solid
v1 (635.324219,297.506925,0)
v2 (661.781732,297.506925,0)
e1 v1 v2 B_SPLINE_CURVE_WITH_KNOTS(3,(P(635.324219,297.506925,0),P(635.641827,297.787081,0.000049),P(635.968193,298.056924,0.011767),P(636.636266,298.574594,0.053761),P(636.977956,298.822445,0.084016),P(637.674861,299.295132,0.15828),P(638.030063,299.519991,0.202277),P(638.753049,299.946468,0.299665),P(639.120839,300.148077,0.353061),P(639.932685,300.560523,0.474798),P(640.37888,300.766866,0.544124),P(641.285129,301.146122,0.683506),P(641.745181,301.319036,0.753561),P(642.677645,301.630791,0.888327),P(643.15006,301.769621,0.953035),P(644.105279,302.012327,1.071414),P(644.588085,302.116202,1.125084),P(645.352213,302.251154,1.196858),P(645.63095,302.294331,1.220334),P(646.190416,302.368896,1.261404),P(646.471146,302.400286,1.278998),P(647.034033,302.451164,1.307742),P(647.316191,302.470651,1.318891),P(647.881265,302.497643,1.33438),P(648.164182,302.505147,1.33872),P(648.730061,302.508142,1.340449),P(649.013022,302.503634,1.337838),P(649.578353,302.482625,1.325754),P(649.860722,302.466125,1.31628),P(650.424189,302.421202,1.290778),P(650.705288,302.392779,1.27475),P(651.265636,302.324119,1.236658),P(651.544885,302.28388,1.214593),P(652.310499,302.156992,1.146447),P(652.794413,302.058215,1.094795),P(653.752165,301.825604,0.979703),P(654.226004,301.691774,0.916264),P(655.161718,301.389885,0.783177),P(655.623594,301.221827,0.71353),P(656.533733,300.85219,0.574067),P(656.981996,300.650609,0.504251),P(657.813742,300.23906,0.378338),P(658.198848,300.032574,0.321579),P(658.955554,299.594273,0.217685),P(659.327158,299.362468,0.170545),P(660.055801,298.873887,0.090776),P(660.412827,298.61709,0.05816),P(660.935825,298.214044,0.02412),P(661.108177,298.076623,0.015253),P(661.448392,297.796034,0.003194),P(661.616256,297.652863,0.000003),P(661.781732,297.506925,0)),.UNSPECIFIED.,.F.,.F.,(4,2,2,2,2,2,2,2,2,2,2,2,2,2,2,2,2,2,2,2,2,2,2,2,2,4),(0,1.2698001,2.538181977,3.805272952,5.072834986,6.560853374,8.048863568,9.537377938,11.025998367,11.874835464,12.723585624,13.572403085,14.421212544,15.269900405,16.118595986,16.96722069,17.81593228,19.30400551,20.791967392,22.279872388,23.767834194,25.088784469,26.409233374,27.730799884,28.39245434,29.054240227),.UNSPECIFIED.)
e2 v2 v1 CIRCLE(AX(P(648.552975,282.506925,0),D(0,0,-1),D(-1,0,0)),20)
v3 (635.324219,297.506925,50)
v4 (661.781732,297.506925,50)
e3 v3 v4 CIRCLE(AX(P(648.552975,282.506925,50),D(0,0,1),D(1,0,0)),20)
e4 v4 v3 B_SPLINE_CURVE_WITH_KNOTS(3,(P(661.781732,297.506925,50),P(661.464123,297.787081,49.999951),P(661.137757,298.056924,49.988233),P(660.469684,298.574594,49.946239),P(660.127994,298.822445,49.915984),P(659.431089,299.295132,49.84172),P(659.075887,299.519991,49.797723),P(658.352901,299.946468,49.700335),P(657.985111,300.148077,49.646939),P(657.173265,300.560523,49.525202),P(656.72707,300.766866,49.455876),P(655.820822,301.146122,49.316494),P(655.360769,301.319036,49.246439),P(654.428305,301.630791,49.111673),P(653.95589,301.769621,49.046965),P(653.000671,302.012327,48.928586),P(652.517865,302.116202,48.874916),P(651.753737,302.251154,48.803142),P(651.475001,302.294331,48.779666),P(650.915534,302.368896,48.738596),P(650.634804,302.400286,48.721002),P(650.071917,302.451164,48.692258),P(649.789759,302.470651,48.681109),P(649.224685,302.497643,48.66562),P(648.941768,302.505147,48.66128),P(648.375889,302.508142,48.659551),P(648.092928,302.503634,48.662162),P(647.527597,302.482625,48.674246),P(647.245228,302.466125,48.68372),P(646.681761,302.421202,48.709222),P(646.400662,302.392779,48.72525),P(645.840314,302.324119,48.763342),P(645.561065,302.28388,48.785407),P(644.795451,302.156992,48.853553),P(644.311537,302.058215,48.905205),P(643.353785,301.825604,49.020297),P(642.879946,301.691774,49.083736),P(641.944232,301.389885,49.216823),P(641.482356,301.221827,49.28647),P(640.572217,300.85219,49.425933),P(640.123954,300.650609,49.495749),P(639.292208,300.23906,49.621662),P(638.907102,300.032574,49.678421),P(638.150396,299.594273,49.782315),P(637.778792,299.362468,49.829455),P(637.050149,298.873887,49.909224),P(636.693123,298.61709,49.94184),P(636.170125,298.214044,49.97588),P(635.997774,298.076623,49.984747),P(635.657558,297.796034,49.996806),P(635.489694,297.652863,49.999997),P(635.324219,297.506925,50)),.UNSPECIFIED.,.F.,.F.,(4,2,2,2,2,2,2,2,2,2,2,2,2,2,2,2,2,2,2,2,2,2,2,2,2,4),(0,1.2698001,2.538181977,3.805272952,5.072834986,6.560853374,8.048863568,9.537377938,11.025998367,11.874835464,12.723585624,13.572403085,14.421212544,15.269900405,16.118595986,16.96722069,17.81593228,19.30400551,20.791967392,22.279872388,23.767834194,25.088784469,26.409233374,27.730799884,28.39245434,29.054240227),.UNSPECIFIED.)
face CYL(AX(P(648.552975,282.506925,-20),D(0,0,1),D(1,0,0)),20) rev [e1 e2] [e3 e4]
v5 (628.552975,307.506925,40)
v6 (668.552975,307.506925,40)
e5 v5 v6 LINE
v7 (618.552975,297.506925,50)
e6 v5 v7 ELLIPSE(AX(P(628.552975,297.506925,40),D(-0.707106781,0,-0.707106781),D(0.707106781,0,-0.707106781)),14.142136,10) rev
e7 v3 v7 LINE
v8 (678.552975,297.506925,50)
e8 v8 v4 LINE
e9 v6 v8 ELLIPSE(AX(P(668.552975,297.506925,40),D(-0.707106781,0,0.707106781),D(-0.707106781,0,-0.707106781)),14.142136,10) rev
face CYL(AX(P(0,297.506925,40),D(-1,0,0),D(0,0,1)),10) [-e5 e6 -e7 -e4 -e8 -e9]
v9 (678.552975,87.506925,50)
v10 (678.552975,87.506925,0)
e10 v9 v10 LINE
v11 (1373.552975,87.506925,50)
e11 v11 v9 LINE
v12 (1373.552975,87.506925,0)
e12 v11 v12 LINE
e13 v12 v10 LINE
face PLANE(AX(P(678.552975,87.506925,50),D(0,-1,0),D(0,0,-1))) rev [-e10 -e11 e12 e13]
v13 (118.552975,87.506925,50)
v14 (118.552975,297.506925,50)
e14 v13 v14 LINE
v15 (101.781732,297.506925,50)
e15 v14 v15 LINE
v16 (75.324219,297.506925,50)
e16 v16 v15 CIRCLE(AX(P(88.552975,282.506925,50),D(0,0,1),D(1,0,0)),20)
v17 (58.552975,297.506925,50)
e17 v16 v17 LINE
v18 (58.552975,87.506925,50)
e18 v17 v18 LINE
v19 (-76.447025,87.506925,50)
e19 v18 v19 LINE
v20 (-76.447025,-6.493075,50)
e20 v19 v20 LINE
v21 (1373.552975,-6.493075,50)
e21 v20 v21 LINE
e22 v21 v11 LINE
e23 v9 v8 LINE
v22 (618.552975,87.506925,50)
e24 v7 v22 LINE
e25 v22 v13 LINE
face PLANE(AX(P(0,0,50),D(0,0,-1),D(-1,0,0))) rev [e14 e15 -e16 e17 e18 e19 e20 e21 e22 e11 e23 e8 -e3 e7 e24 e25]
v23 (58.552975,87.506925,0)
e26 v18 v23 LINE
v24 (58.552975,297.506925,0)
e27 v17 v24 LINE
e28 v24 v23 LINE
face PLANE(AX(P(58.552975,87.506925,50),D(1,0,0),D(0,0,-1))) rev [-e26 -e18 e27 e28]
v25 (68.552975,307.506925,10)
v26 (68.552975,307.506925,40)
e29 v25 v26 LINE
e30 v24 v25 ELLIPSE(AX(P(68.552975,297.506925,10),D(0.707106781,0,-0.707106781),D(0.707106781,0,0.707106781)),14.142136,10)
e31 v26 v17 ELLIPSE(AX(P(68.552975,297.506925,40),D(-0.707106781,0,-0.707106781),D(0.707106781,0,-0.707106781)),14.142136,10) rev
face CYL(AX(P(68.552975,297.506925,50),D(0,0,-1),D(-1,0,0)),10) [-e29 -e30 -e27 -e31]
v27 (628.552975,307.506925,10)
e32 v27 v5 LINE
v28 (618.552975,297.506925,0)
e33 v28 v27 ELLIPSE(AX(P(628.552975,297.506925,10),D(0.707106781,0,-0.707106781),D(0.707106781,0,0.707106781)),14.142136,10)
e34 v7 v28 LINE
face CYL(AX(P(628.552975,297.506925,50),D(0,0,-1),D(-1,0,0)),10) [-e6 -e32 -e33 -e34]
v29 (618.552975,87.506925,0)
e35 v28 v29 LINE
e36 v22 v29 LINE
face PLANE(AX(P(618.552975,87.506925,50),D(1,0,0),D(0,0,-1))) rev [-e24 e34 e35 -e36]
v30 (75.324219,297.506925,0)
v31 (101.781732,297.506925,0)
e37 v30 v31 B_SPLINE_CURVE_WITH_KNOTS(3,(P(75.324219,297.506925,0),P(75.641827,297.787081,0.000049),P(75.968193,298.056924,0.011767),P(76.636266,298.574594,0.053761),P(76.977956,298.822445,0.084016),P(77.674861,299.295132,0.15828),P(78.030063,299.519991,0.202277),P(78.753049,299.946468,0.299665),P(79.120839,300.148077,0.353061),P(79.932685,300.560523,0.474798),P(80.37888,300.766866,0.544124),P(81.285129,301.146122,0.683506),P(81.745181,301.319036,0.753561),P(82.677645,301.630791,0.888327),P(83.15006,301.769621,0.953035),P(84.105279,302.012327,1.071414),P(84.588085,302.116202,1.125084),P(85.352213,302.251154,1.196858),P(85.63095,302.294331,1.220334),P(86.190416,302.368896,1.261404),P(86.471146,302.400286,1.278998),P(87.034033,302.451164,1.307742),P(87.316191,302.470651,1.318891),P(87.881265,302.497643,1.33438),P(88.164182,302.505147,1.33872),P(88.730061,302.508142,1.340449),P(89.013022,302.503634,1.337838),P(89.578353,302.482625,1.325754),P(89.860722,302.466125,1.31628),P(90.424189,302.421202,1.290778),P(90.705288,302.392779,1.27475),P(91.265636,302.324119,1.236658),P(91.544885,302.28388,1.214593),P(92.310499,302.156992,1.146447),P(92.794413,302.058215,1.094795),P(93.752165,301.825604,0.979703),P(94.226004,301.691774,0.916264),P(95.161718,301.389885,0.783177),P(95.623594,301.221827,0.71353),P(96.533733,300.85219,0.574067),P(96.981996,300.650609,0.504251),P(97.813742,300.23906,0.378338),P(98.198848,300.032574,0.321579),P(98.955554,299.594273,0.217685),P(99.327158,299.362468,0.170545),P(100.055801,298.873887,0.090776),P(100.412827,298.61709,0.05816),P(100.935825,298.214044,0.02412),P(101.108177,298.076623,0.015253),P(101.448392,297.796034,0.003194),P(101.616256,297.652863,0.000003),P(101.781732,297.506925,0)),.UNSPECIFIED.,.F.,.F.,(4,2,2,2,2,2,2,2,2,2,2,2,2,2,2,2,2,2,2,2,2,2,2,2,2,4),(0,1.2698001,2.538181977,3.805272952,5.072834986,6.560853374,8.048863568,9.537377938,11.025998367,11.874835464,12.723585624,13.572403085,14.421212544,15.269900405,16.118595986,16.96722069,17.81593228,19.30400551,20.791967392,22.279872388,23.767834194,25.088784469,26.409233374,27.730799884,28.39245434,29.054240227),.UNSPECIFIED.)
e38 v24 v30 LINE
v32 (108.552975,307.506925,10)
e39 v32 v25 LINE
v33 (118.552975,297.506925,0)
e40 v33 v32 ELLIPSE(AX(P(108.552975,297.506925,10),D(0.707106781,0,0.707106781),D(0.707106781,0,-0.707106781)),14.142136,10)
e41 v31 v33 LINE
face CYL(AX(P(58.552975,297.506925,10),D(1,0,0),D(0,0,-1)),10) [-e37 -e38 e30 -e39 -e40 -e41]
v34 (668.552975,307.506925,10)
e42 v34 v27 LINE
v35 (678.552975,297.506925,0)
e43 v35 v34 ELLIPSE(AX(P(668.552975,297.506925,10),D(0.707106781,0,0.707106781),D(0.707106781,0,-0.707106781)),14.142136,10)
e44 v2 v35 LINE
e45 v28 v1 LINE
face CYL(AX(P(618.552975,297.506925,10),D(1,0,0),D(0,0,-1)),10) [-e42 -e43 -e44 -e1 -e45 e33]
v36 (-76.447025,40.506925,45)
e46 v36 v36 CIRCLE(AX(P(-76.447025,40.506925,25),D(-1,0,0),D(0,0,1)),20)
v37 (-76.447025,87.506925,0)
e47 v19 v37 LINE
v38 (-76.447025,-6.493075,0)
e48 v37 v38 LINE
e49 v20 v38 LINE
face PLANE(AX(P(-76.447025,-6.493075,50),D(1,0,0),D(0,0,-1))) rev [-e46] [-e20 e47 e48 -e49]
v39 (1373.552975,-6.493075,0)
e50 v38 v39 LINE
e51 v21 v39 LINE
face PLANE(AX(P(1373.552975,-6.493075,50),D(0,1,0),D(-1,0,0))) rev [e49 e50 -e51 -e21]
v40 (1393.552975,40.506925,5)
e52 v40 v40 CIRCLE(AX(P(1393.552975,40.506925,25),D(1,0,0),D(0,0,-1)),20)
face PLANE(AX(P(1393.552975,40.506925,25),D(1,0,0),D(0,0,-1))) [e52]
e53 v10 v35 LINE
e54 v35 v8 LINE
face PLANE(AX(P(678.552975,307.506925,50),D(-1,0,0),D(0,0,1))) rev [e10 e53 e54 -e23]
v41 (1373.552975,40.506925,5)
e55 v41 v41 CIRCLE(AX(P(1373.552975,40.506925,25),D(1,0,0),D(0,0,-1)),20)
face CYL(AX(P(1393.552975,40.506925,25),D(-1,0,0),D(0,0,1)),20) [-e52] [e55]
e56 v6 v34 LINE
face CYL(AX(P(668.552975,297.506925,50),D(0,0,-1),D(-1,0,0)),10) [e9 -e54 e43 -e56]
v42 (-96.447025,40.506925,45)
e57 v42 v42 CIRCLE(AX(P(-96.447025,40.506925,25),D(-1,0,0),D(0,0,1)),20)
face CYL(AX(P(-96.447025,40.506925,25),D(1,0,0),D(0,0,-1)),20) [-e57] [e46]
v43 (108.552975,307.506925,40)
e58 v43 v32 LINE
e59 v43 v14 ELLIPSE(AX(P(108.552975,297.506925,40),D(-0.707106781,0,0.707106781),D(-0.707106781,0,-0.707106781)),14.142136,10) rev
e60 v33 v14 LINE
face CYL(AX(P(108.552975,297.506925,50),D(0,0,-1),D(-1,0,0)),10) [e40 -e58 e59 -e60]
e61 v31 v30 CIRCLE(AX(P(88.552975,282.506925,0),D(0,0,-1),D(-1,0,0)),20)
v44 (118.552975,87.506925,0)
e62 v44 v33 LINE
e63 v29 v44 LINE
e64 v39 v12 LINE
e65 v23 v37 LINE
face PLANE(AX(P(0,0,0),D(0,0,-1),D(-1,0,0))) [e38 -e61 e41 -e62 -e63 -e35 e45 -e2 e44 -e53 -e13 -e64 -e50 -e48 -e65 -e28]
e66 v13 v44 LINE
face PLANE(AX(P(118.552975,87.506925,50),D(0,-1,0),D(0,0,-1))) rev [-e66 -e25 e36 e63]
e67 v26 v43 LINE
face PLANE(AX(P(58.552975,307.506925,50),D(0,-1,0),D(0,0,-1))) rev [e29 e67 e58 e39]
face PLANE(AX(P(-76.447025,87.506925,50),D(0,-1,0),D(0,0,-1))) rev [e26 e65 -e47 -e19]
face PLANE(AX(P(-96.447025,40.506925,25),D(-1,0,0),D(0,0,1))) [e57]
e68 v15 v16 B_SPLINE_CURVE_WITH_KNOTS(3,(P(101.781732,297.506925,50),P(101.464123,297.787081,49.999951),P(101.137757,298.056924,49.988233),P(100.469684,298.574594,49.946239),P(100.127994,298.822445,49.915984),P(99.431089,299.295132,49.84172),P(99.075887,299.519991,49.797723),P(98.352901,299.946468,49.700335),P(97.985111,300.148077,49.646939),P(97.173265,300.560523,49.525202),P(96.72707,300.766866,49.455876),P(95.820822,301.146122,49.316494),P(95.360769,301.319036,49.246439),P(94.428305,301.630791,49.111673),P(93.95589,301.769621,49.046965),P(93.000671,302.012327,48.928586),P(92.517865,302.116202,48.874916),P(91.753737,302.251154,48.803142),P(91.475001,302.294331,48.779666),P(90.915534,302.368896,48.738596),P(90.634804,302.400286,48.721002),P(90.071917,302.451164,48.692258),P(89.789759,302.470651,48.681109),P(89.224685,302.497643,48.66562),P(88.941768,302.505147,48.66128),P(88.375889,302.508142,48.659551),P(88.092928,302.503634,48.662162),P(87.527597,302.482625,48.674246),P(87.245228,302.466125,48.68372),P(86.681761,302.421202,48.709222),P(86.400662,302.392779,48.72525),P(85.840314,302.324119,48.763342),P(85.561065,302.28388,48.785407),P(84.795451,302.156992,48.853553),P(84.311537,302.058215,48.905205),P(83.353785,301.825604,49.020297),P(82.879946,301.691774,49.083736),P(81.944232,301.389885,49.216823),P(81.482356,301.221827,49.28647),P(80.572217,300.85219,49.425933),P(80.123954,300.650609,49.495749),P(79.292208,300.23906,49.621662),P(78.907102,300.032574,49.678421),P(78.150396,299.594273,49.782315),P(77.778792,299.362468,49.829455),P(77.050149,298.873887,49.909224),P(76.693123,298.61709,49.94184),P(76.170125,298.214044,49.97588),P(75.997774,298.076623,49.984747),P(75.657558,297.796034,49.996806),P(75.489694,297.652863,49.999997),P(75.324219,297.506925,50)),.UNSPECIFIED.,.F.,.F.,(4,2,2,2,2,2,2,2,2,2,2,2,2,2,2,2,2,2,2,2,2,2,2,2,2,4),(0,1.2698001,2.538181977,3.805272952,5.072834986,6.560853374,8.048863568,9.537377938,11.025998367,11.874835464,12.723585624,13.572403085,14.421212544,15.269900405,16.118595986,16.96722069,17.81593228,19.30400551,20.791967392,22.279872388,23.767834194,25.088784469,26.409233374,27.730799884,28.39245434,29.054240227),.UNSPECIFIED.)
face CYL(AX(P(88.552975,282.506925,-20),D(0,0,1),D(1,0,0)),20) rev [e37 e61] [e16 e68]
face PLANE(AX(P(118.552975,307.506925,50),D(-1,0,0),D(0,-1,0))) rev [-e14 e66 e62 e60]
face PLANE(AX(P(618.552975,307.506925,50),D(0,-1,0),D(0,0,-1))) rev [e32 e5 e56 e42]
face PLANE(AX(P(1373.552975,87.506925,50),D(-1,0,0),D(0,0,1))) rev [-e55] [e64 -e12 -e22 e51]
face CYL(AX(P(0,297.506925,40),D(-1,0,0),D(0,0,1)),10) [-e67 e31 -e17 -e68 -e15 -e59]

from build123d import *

# Parameters (mm, degrees)
BOSS_EXTRUDE1_DEPTH = 50
SKETCH2_R           = 20
BOSS_EXTRUDE2_DEPTH = 20
BOSS_EXTRUDE3_START = 20
SKETCH3_R           = 20
BOSS_EXTRUDE3_DEPTH = 20
SKETCH4_R           = 20
CUT_EXTRUDE1_DEPTH  = 70
SKETCH5_R           = 20
CUT_EXTRUDE2_DEPTH  = 70
FILLET1_R           = 10


with BuildPart() as part:
    # Sketch1 → Boss-Extrude1 (new body)
    with BuildSketch(Plane.XY):
        Polygon((-76.447024941, -6.493075274), (-76.447024941, 87.506924726), (58.552975059, 87.506924726), (58.552975059, 307.506924726), (118.552975059, 307.506924726), (118.552975059, 87.506924726), (618.552975059, 87.506924726), (618.552975059, 307.506924726), (678.552975059, 307.506924726), (678.552975059, 87.506924726), (1373.552975059, 87.506924726), (1373.552975059, -6.493075274), align=None)
    extrude(amount=BOSS_EXTRUDE1_DEPTH)

    # Sketch2 → Boss-Extrude2 (add)
    with BuildSketch(Plane.ZY.offset(76.447024941)):
        with Locations((25, 40.506924726)):
            Circle(SKETCH2_R)
    extrude(amount=BOSS_EXTRUDE2_DEPTH)

    # Sketch3 → Boss-Extrude3 (add)
    with BuildSketch(Plane(origin=(1373.552975059, 0, 0), x_dir=(0, 0, -1), z_dir=(1, 0, 0)).offset(BOSS_EXTRUDE3_START)):
        with Locations(Location((-25, 40.506924726, 0), (0, 0, 180))):
            Circle(SKETCH3_R)
    extrude(amount=-BOSS_EXTRUDE3_DEPTH)

    # Sketch4 → Cut-Extrude1 (cut)
    with BuildSketch(Plane.XY.offset(50)):
        with Locations((88.552975059, 282.506924726)):
            Circle(SKETCH4_R)
    extrude(amount=-CUT_EXTRUDE1_DEPTH, mode=Mode.SUBTRACT)

    # Sketch5 → Cut-Extrude2 (cut)
    with BuildSketch(Plane.XY.offset(50)):
        with Locations((648.552975059, 282.506924726)):
            Circle(SKETCH5_R)
    extrude(amount=-CUT_EXTRUDE2_DEPTH, mode=Mode.SUBTRACT)

    # Fillet1
    # the kernel refuses this fillet: 10 mm, written as the material it takes off along each edge
    with BuildSketch(Plane(origin=(33.552975059, 307.506924726, 0), x_dir=(0, -1, 0), z_dir=(1, 0, 0)), Plane(origin=(593.552975059, 307.506924726, 0), x_dir=(0, -1, 0), z_dir=(1, 0, 0))) as fillet1_piece_1:
        with BuildLine():
            CenterArc((FILLET1_R, -FILLET1_R), FILLET1_R, 90, 90)
            Line((0, -FILLET1_R), (0, 0))
            Line((0, 0), (FILLET1_R, 0))
        make_face()
    extrude(amount=110, mode=Mode.SUBTRACT)
    with BuildSketch(Plane(origin=(593.552975059, 307.506924726, 50), x_dir=(0, -1, 0), z_dir=(1, 0, 0)), Plane(origin=(33.552975059, 307.506924726, 50), x_dir=(0, -1, 0), z_dir=(1, 0, 0))) as fillet1_piece_2:
        with BuildLine():
            CenterArc((FILLET1_R, FILLET1_R), FILLET1_R, 180, 90)
            Line((0, FILLET1_R), (0, 0))
            Line((0, 0), (FILLET1_R, 0))
        make_face()
    extrude(amount=110, mode=Mode.SUBTRACT)
    with BuildSketch(Plane(origin=(58.552975059, 307.506924726, -25), x_dir=(0, -1, 0), z_dir=(0, 0, 1)), Plane(origin=(118.552975059, 307.506924726, -25), x_dir=(-1, 0, 0), z_dir=(0, 0, 1))) as fillet1_piece_3:
        with BuildLine():
            CenterArc((FILLET1_R, FILLET1_R), FILLET1_R, 180, 90)
            Line((0, FILLET1_R), (0, 0))
            Line((0, 0), (FILLET1_R, 0))
        make_face()
    extrude(amount=100, mode=Mode.SUBTRACT)
    with BuildSketch(Plane(origin=(618.552975059, 307.506924726, -25), x_dir=(1, 0, 0), z_dir=(0, 0, 1)), Plane(origin=(678.552975059, 307.506924726, -25), x_dir=(0, -1, 0), z_dir=(0, 0, 1))) as fillet1_piece_4:
        with BuildLine():
            CenterArc((FILLET1_R, -FILLET1_R), FILLET1_R, 90, 90)
            Line((0, -FILLET1_R), (0, 0))
            Line((0, 0), (FILLET1_R, 0))
        make_face()
    extrude(amount=100, mode=Mode.SUBTRACT)


solid = part.part
